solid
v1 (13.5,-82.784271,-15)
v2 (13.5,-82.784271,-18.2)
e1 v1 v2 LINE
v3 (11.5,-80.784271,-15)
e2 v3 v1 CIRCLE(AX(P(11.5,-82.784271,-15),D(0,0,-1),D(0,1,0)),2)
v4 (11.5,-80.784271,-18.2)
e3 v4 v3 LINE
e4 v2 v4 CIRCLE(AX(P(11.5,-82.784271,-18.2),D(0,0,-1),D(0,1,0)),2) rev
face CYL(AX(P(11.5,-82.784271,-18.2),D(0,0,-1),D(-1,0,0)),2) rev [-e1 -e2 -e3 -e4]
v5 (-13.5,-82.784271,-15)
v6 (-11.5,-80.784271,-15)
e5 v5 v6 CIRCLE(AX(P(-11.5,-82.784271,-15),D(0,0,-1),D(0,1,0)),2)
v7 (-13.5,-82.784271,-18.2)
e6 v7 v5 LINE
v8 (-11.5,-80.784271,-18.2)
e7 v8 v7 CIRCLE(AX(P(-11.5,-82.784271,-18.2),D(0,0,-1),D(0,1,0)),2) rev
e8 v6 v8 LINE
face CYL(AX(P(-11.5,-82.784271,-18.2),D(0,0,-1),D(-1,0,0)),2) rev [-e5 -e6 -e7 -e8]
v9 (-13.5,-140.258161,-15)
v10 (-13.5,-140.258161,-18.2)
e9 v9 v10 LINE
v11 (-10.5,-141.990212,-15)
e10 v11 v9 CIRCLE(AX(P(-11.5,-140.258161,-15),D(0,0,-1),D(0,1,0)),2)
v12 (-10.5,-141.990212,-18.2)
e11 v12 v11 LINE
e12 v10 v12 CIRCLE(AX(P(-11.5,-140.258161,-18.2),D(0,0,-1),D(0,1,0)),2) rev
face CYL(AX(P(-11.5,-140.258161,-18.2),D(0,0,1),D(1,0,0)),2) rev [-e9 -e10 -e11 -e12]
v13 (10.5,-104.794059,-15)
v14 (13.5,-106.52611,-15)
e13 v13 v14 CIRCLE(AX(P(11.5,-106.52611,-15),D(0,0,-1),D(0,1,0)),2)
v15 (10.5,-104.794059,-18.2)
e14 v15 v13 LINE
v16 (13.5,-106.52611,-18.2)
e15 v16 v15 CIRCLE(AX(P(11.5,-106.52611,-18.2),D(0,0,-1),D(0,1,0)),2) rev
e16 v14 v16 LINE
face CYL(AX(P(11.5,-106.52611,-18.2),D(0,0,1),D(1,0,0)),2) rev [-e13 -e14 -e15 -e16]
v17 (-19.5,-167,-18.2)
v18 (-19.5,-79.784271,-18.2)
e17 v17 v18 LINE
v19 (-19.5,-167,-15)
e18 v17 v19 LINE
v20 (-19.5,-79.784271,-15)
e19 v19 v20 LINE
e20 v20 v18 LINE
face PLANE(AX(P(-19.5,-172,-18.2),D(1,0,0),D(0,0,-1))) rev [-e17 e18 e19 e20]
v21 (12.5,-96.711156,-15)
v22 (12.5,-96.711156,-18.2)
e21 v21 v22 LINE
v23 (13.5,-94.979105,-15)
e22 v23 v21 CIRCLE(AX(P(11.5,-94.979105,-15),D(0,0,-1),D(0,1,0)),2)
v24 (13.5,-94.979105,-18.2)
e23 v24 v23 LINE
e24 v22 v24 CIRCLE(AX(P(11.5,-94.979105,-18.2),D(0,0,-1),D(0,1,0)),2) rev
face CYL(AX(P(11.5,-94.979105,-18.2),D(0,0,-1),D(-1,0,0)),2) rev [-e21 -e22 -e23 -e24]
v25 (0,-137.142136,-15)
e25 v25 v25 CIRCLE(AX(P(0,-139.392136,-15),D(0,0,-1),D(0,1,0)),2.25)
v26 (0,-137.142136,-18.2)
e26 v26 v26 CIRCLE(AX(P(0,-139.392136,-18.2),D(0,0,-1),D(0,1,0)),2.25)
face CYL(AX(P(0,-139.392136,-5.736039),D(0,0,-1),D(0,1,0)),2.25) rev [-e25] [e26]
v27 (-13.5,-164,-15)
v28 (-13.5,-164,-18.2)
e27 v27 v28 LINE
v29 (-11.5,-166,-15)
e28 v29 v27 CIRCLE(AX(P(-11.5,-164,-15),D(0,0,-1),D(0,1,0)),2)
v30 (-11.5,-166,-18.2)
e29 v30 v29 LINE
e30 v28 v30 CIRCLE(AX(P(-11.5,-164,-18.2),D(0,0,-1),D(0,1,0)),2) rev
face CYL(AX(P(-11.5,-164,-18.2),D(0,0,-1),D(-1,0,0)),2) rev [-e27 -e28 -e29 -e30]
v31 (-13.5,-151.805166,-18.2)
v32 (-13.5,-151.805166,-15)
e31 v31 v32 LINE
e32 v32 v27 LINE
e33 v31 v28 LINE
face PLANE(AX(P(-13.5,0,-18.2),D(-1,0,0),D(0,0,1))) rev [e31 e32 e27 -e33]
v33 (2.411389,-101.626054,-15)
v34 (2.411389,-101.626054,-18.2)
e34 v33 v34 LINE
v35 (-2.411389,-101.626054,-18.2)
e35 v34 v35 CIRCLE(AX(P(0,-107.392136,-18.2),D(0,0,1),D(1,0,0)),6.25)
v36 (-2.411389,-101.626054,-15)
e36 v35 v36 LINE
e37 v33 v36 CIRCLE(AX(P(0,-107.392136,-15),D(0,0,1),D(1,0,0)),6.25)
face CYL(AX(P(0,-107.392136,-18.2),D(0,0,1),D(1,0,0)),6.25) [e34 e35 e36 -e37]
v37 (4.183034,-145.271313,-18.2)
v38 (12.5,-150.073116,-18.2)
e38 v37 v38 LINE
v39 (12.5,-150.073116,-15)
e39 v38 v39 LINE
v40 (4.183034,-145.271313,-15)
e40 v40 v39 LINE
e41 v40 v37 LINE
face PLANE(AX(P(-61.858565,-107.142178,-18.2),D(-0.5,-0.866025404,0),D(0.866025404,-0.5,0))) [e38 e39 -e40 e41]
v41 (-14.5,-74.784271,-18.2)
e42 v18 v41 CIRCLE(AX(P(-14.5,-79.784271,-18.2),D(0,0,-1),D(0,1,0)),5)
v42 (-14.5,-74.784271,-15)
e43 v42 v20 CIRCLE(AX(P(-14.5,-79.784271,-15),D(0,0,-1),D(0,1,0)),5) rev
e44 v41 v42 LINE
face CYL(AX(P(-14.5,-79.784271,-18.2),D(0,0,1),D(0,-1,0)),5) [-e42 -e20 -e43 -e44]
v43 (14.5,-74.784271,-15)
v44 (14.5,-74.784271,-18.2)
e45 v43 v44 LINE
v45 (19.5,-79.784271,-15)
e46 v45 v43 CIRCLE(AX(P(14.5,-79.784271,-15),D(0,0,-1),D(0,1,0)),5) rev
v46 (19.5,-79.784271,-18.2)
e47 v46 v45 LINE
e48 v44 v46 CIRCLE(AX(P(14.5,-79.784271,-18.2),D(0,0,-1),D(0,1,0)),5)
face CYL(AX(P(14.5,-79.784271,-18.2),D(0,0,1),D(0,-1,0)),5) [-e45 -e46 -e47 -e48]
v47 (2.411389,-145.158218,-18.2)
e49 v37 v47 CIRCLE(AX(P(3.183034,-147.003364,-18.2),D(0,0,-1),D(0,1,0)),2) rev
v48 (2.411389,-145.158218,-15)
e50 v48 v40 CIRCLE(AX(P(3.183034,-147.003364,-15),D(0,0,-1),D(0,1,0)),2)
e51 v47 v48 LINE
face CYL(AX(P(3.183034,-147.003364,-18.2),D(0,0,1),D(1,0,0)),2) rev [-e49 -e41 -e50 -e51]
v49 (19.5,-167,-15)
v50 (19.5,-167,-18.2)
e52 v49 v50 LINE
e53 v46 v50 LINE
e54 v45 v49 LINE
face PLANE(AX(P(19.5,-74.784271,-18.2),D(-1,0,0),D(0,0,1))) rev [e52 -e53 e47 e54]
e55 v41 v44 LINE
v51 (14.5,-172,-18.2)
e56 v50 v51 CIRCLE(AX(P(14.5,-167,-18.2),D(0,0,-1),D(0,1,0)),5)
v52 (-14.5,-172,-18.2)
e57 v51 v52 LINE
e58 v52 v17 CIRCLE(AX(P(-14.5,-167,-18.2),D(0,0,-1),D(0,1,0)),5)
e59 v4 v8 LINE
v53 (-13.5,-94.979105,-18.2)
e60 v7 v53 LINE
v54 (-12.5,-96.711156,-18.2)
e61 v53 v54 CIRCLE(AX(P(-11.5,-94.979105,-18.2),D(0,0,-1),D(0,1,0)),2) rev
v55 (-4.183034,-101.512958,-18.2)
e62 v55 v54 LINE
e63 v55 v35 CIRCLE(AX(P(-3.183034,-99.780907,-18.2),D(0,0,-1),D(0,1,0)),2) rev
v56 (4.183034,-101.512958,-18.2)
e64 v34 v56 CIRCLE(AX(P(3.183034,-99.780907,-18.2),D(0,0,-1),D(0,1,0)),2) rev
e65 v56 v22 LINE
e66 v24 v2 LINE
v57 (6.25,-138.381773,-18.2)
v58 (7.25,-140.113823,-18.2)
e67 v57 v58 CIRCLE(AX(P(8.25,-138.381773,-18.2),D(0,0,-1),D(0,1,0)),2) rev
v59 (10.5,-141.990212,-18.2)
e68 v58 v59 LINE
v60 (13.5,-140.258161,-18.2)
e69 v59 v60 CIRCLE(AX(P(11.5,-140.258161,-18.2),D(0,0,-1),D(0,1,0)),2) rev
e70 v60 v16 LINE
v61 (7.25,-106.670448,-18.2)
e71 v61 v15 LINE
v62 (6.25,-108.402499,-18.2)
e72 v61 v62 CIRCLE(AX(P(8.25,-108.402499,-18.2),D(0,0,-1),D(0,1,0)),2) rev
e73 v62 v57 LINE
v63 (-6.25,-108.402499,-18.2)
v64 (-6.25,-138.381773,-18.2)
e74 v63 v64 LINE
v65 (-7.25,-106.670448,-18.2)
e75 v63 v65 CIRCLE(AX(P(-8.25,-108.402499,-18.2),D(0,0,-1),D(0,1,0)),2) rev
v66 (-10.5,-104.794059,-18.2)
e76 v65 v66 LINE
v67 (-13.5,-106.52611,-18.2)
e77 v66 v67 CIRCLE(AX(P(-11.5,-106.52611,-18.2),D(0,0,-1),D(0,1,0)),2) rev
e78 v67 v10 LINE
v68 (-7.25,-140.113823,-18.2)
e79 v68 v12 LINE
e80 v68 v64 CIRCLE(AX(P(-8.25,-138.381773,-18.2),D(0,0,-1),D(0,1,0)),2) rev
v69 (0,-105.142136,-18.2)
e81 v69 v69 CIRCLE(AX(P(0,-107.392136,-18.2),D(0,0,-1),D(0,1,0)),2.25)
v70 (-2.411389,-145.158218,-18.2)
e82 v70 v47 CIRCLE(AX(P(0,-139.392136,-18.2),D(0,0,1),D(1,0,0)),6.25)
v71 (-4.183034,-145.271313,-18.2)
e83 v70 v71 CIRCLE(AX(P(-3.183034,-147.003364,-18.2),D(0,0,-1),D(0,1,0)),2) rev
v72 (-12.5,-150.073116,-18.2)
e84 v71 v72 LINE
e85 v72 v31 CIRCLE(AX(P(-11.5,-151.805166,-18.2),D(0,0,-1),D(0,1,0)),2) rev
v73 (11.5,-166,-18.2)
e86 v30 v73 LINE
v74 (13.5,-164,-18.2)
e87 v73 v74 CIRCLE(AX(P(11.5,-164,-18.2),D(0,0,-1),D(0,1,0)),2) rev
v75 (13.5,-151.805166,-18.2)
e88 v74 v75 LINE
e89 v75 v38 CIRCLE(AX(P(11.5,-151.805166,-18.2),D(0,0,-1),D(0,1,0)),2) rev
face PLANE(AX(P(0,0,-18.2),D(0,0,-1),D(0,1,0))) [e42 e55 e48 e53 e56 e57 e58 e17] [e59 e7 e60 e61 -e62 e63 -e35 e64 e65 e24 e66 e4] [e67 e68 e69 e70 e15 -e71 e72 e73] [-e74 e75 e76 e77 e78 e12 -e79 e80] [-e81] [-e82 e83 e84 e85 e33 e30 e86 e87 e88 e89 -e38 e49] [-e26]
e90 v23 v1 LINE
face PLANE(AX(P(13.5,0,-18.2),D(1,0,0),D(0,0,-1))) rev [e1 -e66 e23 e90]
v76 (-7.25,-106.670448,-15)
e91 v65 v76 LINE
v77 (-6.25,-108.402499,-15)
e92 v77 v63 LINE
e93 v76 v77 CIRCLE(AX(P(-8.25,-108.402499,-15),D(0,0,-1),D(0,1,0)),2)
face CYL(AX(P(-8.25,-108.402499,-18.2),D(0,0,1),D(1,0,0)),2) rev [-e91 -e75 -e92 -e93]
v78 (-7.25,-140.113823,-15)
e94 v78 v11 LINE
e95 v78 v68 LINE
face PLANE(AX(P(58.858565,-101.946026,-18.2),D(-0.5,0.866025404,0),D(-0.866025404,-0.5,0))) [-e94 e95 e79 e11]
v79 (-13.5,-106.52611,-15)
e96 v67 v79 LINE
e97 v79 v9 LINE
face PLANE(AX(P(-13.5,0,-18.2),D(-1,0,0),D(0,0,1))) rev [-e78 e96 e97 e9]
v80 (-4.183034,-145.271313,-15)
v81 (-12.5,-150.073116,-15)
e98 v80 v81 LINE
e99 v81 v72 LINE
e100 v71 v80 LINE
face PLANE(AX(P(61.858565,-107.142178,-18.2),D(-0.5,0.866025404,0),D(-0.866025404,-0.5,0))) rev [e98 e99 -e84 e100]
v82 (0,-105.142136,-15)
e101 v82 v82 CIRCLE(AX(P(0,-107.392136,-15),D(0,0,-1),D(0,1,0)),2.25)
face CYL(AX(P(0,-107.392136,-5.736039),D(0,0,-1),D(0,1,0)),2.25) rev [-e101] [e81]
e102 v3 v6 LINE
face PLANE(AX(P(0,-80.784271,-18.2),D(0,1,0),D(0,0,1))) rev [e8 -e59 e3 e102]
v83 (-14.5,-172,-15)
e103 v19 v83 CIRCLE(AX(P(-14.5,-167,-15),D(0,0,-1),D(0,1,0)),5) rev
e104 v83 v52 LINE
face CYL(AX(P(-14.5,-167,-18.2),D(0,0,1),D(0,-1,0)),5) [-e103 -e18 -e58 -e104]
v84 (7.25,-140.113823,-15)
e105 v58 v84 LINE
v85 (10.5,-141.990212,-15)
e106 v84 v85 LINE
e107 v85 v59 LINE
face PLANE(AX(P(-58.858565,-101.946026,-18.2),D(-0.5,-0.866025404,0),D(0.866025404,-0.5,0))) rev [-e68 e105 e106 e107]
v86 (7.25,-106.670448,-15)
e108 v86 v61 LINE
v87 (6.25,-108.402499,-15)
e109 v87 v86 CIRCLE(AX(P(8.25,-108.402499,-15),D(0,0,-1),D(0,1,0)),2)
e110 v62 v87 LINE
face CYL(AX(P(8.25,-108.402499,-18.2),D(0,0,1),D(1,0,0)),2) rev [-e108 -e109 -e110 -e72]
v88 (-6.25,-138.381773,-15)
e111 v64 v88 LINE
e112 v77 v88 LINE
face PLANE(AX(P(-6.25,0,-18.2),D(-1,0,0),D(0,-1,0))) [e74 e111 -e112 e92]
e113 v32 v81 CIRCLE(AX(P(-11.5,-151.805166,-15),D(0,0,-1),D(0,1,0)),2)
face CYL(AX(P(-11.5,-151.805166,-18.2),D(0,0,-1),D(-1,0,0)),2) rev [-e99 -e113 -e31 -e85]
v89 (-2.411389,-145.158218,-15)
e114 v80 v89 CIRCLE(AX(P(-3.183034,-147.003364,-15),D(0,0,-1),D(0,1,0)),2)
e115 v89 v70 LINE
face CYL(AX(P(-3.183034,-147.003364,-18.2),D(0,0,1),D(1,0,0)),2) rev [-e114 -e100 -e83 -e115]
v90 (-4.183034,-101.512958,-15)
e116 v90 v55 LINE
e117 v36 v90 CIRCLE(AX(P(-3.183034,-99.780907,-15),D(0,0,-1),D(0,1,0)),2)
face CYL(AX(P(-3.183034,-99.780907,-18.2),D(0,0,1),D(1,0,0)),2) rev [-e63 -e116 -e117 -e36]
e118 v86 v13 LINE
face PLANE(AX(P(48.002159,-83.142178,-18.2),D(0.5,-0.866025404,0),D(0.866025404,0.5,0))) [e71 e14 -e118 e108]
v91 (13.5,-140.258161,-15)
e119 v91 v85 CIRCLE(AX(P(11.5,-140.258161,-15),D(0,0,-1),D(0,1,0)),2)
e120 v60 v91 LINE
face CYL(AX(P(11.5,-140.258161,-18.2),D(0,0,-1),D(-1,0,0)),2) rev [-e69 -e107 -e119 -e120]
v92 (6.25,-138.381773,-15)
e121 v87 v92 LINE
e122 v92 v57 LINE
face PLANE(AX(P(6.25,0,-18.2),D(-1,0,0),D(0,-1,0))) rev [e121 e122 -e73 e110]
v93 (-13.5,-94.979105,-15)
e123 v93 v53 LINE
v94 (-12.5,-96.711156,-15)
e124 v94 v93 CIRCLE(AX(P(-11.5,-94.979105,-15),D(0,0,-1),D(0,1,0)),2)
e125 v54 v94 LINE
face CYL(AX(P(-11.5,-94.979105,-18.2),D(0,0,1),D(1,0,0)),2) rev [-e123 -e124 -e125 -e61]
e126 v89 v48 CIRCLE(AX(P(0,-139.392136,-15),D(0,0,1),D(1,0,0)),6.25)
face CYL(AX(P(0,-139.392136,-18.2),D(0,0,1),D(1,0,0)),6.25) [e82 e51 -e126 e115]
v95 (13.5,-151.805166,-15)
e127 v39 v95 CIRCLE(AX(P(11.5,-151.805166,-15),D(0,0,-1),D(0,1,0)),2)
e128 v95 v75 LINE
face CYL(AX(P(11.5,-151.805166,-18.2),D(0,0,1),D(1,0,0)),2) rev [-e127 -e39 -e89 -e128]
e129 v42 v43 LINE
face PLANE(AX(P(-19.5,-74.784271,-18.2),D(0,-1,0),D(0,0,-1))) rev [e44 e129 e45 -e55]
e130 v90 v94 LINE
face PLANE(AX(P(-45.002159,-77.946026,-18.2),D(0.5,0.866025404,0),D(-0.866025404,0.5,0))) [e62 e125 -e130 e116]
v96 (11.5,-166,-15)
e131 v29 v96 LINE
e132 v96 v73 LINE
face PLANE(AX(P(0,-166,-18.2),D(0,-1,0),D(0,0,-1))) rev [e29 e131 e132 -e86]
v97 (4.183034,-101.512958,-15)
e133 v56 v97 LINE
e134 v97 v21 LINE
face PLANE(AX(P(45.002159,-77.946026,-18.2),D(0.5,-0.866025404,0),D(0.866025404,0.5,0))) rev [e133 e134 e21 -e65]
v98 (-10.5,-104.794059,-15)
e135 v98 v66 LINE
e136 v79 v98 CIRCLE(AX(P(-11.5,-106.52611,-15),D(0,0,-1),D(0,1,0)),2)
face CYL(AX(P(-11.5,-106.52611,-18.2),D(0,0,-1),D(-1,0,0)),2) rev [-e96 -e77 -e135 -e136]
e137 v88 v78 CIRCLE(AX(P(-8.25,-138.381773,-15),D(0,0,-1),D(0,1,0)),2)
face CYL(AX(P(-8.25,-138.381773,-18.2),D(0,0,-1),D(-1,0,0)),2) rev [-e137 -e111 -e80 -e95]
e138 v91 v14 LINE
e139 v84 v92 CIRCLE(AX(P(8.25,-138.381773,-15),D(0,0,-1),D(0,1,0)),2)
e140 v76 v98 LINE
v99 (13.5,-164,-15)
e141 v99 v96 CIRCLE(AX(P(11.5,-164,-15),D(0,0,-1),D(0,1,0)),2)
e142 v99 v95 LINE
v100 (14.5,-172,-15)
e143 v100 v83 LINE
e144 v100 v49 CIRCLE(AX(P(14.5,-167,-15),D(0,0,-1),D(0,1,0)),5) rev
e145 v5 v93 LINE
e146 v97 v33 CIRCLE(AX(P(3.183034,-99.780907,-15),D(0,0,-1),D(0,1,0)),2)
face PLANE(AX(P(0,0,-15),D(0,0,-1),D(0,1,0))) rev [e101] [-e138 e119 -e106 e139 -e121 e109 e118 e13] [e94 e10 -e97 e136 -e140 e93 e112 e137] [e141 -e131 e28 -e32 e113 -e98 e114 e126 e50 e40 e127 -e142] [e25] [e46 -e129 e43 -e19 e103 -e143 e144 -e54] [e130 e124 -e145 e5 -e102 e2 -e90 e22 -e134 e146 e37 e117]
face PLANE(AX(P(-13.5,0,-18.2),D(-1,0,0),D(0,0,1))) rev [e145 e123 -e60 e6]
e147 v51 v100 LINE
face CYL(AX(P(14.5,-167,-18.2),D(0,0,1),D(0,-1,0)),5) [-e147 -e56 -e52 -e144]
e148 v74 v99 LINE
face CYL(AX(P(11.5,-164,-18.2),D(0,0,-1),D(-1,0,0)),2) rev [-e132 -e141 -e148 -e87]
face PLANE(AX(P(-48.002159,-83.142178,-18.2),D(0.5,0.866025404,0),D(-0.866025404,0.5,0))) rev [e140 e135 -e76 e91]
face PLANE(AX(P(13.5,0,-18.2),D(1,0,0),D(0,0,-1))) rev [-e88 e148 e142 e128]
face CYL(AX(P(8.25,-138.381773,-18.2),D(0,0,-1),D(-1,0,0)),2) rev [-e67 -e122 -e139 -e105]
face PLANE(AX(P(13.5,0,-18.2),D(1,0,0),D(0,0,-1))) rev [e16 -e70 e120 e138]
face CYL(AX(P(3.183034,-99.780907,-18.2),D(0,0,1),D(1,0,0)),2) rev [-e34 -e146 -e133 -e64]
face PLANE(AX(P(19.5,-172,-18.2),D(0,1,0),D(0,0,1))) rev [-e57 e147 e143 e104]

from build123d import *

# Parameters (mm, degrees)
STOCK_SPINE_MASTER_1_START     = -18.2
STOCK_SPINE_MASTER_1_OUTLINE_W = 39
STOCK_SPINE_MASTER_1_OUTLINE_H = 97.215728753
STOCK_SPINE_MASTER_1_OUTLINE_R = 2.25
STOCK_SPINE_MASTER_1_DEPTH     = 3.2
FILLET2_R                      = 5
CUT_EXTRUDE1_DEPTH             = 174.131424069
FILLET5_R                      = 2


# Read off the part's stored shape, not the designer's step: Stock-spine_master-1
with BuildPart() as part:
    # Stock-spine_master-1 outline → Stock-spine_master-1 (new body)
    with BuildSketch(Plane.XY.offset(STOCK_SPINE_MASTER_1_START)):
        with Locations((0, -123.392135623)):
            Rectangle(STOCK_SPINE_MASTER_1_OUTLINE_W, STOCK_SPINE_MASTER_1_OUTLINE_H)
        with Locations((0, -139.392135624)):
            Circle(STOCK_SPINE_MASTER_1_OUTLINE_R, mode=Mode.SUBTRACT)
        with Locations((0, -107.392135624)):
            Circle(STOCK_SPINE_MASTER_1_OUTLINE_R, mode=Mode.SUBTRACT)
    extrude(amount=STOCK_SPINE_MASTER_1_DEPTH)

    # Fillet2
    fillet2_edges = [part.edges().sort_by_distance(p)[0] for p in [
        (19.5, -172, -16.6),
        (19.5, -74.784271247, -16.6),
        (-19.5, -74.784271247, -16.6),
        (-19.5, -172, -16.6),
    ]]
    fillet(fillet2_edges, radius=FILLET2_R)

    # Sketch1 → Cut-Extrude1 (cut, through all)
    with BuildSketch(Plane.XY.offset(-15)):
        with BuildLine():
            Line((-6.248354978, -107.24874781), (-13.5, -103.062008605))
            Line((-13.5, -103.062008605), (-13.5, -143.722262643))
            Line((-13.5, -143.722262643), (-6.248354978, -139.535523437))
            ThreePointArc((-6.248354978, -139.535523437), (-6.249588731, -139.463834249), (-6.25, -139.392135624))
            Line((-6.25, -139.392135624), (-6.25, -107.392135624))
            ThreePointArc((-6.25, -107.392135624), (-6.249588731, -107.320436999), (-6.248354978, -107.24874781))
        make_face()
        with BuildLine():
            Line((13.5, -80.784271247), (-13.5, -80.784271247))
            Line((-13.5, -80.784271247), (-13.5, -96.133805375))
            Line((-13.5, -96.133805375), (-3.248354978, -102.052595387))
            ThreePointArc((-3.248354978, -102.052595387), (0, -101.142135624), (3.248354978, -102.052595387))
            Line((3.248354978, -102.052595387), (13.5, -96.133805375))
            Line((13.5, -96.133805375), (13.5, -80.784271247))
        make_face()
        with BuildLine():
            Line((13.5, -143.722262643), (13.5, -103.062008605))
            Line((13.5, -103.062008605), (6.248354978, -107.24874781))
            ThreePointArc((6.248354978, -107.24874781), (6.249588731, -107.320436999), (6.25, -107.392135624))
            Line((6.25, -107.392135624), (6.25, -139.392135624))
            ThreePointArc((6.25, -139.392135624), (6.249588731, -139.463834249), (6.248354978, -139.535523437))
            Line((6.248354978, -139.535523437), (13.5, -143.722262643))
        make_face()
        with BuildLine():
            Line((-3.248354978, -144.73167586), (-13.5, -150.650465873))
            Line((-13.5, -150.650465873), (-13.5, -166))
            Line((-13.5, -166), (13.5, -166))
            Line((13.5, -166), (13.5, -150.650465873))
            Line((13.5, -150.650465873), (3.248354978, -144.73167586))
            ThreePointArc((3.248354978, -144.73167586), (0, -145.642135624), (-3.248354978, -144.73167586))
        make_face()
    extrude(amount=-CUT_EXTRUDE1_DEPTH, mode=Mode.SUBTRACT)

    # Fillet5
    # the kernel refuses this fillet: 2 mm, written as the material it adds along each edge
    with BuildSketch(Plane(origin=(-6.248354978, -107.24874781, -15), x_dir=(-0.8660254037844632, 0.4999999999999575, 0), z_dir=(0, 0, -1)), Plane(origin=(6.248354978, -139.535523437, -15), x_dir=(0.8660254037844526, -0.4999999999999759, 0), z_dir=(0, 0, -1))) as fillet5_piece_1:
        with BuildLine():
            CenterArc((1.156600046, -2), FILLET5_R, 90, 60)
            Line((-0.575450762, -1), (-0.748655843, -0.9))
            ThreePointArc((-0.748655843, -0.9), (-0.243474357, -0.025), (-0.175453698, 0.096))
            Line((-0.175453698, 0.096), (0, 0.2))
            Line((0, 0.2), (1.156600046, 0.2))
            Line((1.156600046, 0.2), (1.156600046, 0))
        make_face()
    extrude(amount=3.2)
    with BuildSketch(Plane(origin=(6.248354978, -107.24874781, -15), x_dir=(0.8660254037844632, 0.4999999999999575, 0), z_dir=(0, 0, -1)), Plane(origin=(-6.248354978, -139.535523437, -15), x_dir=(-0.8660254037844523, -0.4999999999999766, 0), z_dir=(0, 0, -1))) as fillet5_piece_2:
        with BuildLine():
            CenterArc((1.156600046, 2), FILLET5_R, 210, 60)
            Line((-0.575450762, 1), (-0.748655843, 0.9))
            ThreePointArc((-0.748655843, 0.9), (-0.243474357, 0.025), (-0.175453698, -0.096))
            Line((-0.175453698, -0.096), (0, -0.2))
            Line((0, -0.2), (1.156600046, -0.2))
            Line((1.156600046, -0.2), (1.156600046, 0))
        make_face()
    extrude(amount=3.2)
    with BuildSketch(Plane(origin=(-13.5, -166, -15), x_dir=(0, 1, 0), z_dir=(0, 0, -1)), Plane(origin=(13.5, -166, -15), x_dir=(-1, 0, 0), z_dir=(0, 0, -1)), Plane(origin=(-13.5, -80.784271247, -15), x_dir=(1, 0, 0), z_dir=(0, 0, -1))) as fillet5_piece_3:
        with BuildLine():
            CenterArc((FILLET5_R, FILLET5_R), FILLET5_R, 180, 90)
            Line((0, FILLET5_R), (0, 0))
            Line((0, 0), (FILLET5_R, 0))
        make_face()
    extrude(amount=3.2)
    with BuildSketch(Plane(origin=(13.5, -150.650465873, -15), x_dir=(0, -1, 0), z_dir=(0, 0, -1)), Plane(origin=(13.5, -96.133805375, -15), x_dir=(-0.8660254037844395, -0.49999999999999867, 0), z_dir=(0, 0, -1)), Plane(origin=(-13.5, -96.133805375, -15), x_dir=(0, 1, 0), z_dir=(0, 0, -1)), Plane(origin=(-13.5, -150.650465873, -15), x_dir=(0.8660254037844375, 0.5000000000000019, 0), z_dir=(0, 0, -1))) as fillet5_piece_4:
        with BuildLine():
            CenterArc((FILLET5_R * 0.57735026919, FILLET5_R), FILLET5_R, 210, 60)
            Line((-FILLET5_R * 0.288675134595, FILLET5_R * 0.5), (0, 0))
            Line((0, 0), (FILLET5_R * 0.57735026919, 0))
        make_face()
    extrude(amount=3.2)
    with BuildSketch(Plane(origin=(13.5, -143.722262643, -15), x_dir=(-0.8660254037844394, 0.4999999999999986, 0), z_dir=(0, 0, -1)), Plane(origin=(13.5, -103.062008605, -15), x_dir=(0, -1, 0), z_dir=(0, 0, -1)), Plane(origin=(-13.5, -103.062008605, -15), x_dir=(0.866025403784438, -0.500000000000001, 0), z_dir=(0, 0, -1)), Plane(origin=(-13.5, -143.722262643, -15), x_dir=(0, 1, 0), z_dir=(0, 0, -1))) as fillet5_piece_5:
        with BuildLine():
            CenterArc((FILLET5_R * 1.73205080757, FILLET5_R), FILLET5_R, 150, 120)
            Line((FILLET5_R * 0.866025403784, FILLET5_R * 1.5), (0, 0))
            Line((0, 0), (FILLET5_R * 1.73205080757, 0))
        make_face()
    extrude(amount=3.2)
    with BuildSketch(Plane(origin=(13.5, -80.784271247, -15), x_dir=(-1, 0, 0), z_dir=(0, 0, -1))) as fillet5_piece_6:
        with BuildLine():
            CenterArc((FILLET5_R, -FILLET5_R), FILLET5_R, 90, 90)
            Line((0, -FILLET5_R), (0, 0))
            Line((0, 0), (FILLET5_R, 0))
        make_face()
    extrude(amount=3.2)
    with BuildSketch(Plane(origin=(3.248354978, -144.73167586, -15), x_dir=(0.866025403784452, -0.49999999999997674, 0), z_dir=(0, 0, -1)), Plane(origin=(-3.248354978, -102.052595387, -15), x_dir=(-0.8660254037844742, 0.4999999999999385, 0), z_dir=(0, 0, -1))) as fillet5_piece_7:
        with BuildLine():
            CenterArc((1.079274324, 2), FILLET5_R, 217.305200966, 52.694799034)
            ThreePointArc((-0.511562615, 0.787878788), (-0.240957875, 0.403564115), (0, 0))
            Line((0, 0), (1.079274324, 0))
        make_face()
    extrude(amount=3.2)
    with BuildSketch(Plane(origin=(-3.248354978, -144.73167586, -15), x_dir=(-0.8660254037844329, -0.5000000000000099, 0), z_dir=(0, 0, -1))) as fillet5_piece_8:
        with BuildLine():
            CenterArc((1.079274324, -2), FILLET5_R, 90, 52.694799034)
            ThreePointArc((-0.511562615, -0.787878788), (-0.240957875, -0.403564115), (0, 0))
            Line((0, 0), (1.079274324, 0))
        make_face()
    extrude(amount=3.2)
    with BuildSketch(Plane(origin=(3.248354978, -102.052595387, -15), x_dir=(-0.8909692919420457, 0.4540635647310734, 0), z_dir=(0, 0, -1))) as fillet5_piece_9:
        with BuildLine():
            CenterArc((1.089689758, 1.994344328), FILLET5_R, 212.99530149, 52.694799034)
            Line((-0.587740698, 0.905203811), (0, 0))
            ThreePointArc((0, 0), (0.469693861, 0.017673975), (0.939387723, 0))
        make_face()
    extrude(amount=3.2)


solid = part.part
